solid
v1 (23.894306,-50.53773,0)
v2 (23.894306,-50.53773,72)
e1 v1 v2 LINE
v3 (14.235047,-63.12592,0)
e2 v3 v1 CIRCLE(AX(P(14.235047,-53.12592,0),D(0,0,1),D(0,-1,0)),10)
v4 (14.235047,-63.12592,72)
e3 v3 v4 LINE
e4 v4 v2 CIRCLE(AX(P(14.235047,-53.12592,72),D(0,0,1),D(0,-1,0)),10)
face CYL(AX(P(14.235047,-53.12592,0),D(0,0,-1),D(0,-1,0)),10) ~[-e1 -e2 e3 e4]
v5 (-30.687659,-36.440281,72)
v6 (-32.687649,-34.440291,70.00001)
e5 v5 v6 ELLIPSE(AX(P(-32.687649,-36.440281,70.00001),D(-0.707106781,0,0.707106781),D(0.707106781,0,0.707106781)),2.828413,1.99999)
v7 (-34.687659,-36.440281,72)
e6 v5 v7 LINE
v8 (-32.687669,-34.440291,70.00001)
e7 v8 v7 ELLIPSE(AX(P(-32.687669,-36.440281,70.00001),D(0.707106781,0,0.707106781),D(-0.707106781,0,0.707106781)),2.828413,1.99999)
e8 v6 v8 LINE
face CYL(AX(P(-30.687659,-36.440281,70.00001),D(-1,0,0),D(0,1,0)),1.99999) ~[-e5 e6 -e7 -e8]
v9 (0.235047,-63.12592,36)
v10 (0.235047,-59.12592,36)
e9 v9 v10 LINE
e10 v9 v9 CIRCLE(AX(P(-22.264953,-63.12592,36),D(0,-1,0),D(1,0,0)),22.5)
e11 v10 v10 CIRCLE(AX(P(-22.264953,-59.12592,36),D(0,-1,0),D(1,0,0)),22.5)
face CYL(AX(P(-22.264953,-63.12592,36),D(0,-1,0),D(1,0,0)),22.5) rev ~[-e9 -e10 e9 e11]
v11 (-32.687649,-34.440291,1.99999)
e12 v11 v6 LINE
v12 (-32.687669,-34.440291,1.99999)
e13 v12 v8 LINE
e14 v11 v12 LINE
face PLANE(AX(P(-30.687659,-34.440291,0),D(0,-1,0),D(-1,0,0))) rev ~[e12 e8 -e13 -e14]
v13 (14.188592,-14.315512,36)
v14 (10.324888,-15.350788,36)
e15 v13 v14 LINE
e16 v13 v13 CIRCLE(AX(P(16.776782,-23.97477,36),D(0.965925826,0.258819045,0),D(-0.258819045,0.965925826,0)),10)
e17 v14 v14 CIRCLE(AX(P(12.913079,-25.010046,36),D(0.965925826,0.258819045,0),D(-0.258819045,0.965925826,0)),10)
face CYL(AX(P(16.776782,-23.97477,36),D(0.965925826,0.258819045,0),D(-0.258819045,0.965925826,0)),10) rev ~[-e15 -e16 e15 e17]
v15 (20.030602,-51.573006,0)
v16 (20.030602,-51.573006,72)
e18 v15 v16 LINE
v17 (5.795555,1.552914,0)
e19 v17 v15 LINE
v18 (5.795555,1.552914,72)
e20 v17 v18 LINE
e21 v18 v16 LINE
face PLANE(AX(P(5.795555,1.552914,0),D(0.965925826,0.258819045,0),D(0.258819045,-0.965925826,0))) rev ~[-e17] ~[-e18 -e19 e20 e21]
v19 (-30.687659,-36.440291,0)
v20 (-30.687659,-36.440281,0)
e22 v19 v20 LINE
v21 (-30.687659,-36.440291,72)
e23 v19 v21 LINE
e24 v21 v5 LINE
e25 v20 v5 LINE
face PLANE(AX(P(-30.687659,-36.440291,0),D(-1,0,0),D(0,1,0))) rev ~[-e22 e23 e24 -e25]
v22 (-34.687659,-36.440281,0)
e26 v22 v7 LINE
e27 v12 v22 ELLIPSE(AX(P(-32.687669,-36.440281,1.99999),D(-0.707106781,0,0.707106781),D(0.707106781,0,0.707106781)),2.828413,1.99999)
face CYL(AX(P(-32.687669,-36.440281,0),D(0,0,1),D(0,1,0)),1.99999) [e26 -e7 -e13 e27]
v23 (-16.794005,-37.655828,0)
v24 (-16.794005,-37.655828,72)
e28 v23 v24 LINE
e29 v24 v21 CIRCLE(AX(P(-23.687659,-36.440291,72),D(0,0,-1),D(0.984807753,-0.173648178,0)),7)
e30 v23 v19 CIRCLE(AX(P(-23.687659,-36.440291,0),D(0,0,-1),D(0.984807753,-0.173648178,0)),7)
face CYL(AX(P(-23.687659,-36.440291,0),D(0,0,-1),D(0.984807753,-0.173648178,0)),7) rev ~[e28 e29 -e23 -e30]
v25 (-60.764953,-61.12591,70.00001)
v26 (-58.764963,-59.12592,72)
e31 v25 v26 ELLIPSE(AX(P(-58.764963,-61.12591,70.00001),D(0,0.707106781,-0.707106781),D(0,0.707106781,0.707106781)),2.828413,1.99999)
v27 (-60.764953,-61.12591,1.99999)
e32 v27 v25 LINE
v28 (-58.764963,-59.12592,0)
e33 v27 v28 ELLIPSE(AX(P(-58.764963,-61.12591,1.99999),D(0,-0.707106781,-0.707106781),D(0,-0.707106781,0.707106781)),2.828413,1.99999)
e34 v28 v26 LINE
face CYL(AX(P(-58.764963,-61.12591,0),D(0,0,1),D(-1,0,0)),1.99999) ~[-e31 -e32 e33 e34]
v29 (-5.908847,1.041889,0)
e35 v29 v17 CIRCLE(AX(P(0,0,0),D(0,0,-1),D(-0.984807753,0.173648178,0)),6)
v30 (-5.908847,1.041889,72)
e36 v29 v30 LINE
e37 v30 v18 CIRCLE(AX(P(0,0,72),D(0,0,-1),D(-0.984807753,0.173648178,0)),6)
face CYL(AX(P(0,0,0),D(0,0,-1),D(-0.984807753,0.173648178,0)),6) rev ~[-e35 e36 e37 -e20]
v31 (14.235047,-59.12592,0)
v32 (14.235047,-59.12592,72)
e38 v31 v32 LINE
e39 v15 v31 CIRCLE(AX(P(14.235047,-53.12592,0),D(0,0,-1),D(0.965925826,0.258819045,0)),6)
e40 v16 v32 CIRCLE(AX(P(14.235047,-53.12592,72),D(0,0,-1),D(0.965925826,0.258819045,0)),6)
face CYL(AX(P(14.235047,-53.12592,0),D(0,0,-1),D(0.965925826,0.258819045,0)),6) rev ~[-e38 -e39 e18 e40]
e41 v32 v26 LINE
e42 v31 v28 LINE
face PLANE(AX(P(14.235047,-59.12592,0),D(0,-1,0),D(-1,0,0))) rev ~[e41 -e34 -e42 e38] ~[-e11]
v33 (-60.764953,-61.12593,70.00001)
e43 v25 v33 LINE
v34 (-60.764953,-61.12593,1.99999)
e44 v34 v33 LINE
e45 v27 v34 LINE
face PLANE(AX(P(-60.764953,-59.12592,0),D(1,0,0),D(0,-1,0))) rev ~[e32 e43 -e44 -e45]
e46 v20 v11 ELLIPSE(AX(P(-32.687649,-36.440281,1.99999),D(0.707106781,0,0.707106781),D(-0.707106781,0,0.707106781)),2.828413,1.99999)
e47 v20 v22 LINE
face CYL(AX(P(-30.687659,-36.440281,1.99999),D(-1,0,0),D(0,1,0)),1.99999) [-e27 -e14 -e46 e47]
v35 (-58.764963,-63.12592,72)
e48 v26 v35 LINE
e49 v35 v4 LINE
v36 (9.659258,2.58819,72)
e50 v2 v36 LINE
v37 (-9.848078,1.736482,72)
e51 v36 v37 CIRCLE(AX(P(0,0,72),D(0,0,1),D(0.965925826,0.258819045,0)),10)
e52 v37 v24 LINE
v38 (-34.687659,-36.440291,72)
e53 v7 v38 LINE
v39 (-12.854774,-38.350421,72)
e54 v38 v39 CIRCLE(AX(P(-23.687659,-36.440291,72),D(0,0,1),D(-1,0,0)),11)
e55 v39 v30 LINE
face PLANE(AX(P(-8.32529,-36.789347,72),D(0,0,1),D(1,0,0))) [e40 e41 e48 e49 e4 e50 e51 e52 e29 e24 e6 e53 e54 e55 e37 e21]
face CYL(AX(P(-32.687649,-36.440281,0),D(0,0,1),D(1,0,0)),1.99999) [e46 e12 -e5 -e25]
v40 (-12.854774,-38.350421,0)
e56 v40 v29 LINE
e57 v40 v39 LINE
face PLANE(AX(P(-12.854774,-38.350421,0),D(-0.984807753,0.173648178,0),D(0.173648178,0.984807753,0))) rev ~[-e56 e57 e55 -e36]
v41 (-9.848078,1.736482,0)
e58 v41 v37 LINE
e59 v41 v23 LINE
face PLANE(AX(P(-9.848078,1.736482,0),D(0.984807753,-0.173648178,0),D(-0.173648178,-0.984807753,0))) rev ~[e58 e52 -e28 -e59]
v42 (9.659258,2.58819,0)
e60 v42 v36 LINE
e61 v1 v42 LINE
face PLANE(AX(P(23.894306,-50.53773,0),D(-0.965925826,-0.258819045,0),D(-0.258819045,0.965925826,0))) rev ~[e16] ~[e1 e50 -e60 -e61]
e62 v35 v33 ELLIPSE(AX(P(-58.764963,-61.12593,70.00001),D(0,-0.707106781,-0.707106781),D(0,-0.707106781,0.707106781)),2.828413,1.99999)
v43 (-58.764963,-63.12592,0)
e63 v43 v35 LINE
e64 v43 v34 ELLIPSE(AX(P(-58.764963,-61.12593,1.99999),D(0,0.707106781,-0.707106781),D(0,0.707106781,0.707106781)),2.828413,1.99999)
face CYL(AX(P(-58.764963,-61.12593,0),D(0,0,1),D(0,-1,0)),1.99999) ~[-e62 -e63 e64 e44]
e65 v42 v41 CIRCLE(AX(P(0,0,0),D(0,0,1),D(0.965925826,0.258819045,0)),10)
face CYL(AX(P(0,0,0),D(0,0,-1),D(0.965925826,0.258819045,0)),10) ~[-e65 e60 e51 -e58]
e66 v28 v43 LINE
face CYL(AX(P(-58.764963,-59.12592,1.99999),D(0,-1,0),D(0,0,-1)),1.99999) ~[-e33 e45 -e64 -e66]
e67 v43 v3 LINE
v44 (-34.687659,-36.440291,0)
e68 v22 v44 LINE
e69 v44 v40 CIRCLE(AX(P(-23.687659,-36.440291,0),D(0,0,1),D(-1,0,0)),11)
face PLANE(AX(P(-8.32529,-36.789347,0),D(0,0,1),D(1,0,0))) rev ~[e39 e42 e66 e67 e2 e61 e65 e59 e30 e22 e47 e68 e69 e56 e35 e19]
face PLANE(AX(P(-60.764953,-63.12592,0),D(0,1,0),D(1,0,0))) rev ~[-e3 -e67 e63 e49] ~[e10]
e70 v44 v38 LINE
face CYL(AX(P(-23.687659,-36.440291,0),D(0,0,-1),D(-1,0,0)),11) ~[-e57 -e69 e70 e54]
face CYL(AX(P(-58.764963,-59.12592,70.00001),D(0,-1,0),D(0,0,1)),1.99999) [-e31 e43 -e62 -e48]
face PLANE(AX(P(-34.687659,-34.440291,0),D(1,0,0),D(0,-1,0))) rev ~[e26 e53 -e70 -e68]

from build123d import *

# Parameters (mm, degrees)
F1_DEPTH = 72
F2_R     = 1.99999
F3_R     = 1.99999
F4_R     = 10
F5_DEPTH = 5
F8_R     = 22.5
F9_DEPTH = 5


# Not quite as in the source:
# - a fillet or chamfer is up to 0.001 mm smaller than in the source, because OpenCascade refuses the exact size
# - a feature of the source that left no trace in its solid (it failed there, or was rolled back) is left out


with BuildPart() as f1:
    # F0 (on Top) → F1 (new body)
    with BuildSketch(Plane.XY):
        with BuildLine():
            Line((-9.8480775301, 1.7364817767), (-16.7940046368, -37.6558283438))
            ThreePointArc((-16.7940046368, -37.6558283438), (-24.2977491071, -43.4136539868), (-30.6876589079, -36.4402911002))
            Line((-30.6876589079, -36.4402911002), (-30.6876589079, -34.4402911002))
            Line((-30.6876589079, -34.4402911002), (-34.6876589079, -34.4402911002))
            Line((-34.6876589079, -34.4402911002), (-34.6876589079, -36.4402911002))
            ThreePointArc((-34.6876589079, -36.4402911002), (-24.6463720781, -47.3984327792), (-12.8547736248, -38.3504210545))
            Line((-12.8547736248, -38.3504210545), (-5.9088465181, 1.041889066))
            ThreePointArc((-5.9088465181, 1.041889066), (-0.2617163242, 5.9942893295), (5.7955549577, 1.5529142706))
            Line((5.7955549577, 1.5529142706), (20.0306024384, -51.5730061753))
            ThreePointArc((20.0306024384, -51.5730061753), (18.9951675224, -56.77848902), (14.2350474806, -59.1259204459))
            Line((14.2350474806, -59.1259204459), (-60.7649525194, -59.1259204459))
            Line((-60.7649525194, -59.1259204459), (-60.7649525194, -63.1259204459))
            Line((-60.7649525194, -63.1259204459), (14.2350474806, -63.1259204459))
            ThreePointArc((14.2350474806, -63.1259204459), (22.1685808836, -59.213534736), (23.8943057435, -50.5377299949))
            Line((23.8943057435, -50.5377299949), (9.6592582629, 2.588190451))
            ThreePointArc((9.6592582629, 2.588190451), (-0.4361938737, 9.9904822158), (-9.8480775301, 1.7364817767))
        make_face()
    extrude(amount=F1_DEPTH)

    # F2 (radius 2 in the source; OpenCascade refuses exactly that, so slightly less here)
    f2_edges = [f1.edges().sort_by_distance(p)[0] for p in [
        (-30.687659, -34.440291, 36),
        (-34.687659, -34.440291, 36),
        (-32.687659, -34.440291, 0),
        (-32.687659, -34.440291, 72),
    ]]
    fillet(f2_edges, radius=F2_R)

    # F3 (radius 2 in the source; OpenCascade refuses exactly that, so slightly less here)
    f3_edges = [f1.edges().sort_by_distance(p)[0] for p in [
        (-60.764953, -59.12592, 36),
        (-60.764953, -63.12592, 36),
        (-60.764953, -61.12592, 0),
        (-60.764953, -61.12592, 72),
    ]]
    fillet(f3_edges, radius=F3_R)

    # F4 (on face) → F5 (cut)
    with BuildSketch(Plane(origin=(9.6592582629, 2.588190451, 0), x_dir=(-0.2588190451, 0.9659258263, 0), z_dir=(0.9659258263, 0.2588190451, 0))):
        with Locations((-27.5, 36)):
            Circle(F4_R)
    extrude(amount=-F5_DEPTH, mode=Mode.SUBTRACT)

    # F8 (on face) → F9 (cut)
    with BuildSketch(Plane.XZ.offset(63.1259204459)):
        with Locations((-22.2649525194, 36)):
            Circle(F8_R)
    extrude(amount=-F9_DEPTH, mode=Mode.SUBTRACT)


solid = f1.part
